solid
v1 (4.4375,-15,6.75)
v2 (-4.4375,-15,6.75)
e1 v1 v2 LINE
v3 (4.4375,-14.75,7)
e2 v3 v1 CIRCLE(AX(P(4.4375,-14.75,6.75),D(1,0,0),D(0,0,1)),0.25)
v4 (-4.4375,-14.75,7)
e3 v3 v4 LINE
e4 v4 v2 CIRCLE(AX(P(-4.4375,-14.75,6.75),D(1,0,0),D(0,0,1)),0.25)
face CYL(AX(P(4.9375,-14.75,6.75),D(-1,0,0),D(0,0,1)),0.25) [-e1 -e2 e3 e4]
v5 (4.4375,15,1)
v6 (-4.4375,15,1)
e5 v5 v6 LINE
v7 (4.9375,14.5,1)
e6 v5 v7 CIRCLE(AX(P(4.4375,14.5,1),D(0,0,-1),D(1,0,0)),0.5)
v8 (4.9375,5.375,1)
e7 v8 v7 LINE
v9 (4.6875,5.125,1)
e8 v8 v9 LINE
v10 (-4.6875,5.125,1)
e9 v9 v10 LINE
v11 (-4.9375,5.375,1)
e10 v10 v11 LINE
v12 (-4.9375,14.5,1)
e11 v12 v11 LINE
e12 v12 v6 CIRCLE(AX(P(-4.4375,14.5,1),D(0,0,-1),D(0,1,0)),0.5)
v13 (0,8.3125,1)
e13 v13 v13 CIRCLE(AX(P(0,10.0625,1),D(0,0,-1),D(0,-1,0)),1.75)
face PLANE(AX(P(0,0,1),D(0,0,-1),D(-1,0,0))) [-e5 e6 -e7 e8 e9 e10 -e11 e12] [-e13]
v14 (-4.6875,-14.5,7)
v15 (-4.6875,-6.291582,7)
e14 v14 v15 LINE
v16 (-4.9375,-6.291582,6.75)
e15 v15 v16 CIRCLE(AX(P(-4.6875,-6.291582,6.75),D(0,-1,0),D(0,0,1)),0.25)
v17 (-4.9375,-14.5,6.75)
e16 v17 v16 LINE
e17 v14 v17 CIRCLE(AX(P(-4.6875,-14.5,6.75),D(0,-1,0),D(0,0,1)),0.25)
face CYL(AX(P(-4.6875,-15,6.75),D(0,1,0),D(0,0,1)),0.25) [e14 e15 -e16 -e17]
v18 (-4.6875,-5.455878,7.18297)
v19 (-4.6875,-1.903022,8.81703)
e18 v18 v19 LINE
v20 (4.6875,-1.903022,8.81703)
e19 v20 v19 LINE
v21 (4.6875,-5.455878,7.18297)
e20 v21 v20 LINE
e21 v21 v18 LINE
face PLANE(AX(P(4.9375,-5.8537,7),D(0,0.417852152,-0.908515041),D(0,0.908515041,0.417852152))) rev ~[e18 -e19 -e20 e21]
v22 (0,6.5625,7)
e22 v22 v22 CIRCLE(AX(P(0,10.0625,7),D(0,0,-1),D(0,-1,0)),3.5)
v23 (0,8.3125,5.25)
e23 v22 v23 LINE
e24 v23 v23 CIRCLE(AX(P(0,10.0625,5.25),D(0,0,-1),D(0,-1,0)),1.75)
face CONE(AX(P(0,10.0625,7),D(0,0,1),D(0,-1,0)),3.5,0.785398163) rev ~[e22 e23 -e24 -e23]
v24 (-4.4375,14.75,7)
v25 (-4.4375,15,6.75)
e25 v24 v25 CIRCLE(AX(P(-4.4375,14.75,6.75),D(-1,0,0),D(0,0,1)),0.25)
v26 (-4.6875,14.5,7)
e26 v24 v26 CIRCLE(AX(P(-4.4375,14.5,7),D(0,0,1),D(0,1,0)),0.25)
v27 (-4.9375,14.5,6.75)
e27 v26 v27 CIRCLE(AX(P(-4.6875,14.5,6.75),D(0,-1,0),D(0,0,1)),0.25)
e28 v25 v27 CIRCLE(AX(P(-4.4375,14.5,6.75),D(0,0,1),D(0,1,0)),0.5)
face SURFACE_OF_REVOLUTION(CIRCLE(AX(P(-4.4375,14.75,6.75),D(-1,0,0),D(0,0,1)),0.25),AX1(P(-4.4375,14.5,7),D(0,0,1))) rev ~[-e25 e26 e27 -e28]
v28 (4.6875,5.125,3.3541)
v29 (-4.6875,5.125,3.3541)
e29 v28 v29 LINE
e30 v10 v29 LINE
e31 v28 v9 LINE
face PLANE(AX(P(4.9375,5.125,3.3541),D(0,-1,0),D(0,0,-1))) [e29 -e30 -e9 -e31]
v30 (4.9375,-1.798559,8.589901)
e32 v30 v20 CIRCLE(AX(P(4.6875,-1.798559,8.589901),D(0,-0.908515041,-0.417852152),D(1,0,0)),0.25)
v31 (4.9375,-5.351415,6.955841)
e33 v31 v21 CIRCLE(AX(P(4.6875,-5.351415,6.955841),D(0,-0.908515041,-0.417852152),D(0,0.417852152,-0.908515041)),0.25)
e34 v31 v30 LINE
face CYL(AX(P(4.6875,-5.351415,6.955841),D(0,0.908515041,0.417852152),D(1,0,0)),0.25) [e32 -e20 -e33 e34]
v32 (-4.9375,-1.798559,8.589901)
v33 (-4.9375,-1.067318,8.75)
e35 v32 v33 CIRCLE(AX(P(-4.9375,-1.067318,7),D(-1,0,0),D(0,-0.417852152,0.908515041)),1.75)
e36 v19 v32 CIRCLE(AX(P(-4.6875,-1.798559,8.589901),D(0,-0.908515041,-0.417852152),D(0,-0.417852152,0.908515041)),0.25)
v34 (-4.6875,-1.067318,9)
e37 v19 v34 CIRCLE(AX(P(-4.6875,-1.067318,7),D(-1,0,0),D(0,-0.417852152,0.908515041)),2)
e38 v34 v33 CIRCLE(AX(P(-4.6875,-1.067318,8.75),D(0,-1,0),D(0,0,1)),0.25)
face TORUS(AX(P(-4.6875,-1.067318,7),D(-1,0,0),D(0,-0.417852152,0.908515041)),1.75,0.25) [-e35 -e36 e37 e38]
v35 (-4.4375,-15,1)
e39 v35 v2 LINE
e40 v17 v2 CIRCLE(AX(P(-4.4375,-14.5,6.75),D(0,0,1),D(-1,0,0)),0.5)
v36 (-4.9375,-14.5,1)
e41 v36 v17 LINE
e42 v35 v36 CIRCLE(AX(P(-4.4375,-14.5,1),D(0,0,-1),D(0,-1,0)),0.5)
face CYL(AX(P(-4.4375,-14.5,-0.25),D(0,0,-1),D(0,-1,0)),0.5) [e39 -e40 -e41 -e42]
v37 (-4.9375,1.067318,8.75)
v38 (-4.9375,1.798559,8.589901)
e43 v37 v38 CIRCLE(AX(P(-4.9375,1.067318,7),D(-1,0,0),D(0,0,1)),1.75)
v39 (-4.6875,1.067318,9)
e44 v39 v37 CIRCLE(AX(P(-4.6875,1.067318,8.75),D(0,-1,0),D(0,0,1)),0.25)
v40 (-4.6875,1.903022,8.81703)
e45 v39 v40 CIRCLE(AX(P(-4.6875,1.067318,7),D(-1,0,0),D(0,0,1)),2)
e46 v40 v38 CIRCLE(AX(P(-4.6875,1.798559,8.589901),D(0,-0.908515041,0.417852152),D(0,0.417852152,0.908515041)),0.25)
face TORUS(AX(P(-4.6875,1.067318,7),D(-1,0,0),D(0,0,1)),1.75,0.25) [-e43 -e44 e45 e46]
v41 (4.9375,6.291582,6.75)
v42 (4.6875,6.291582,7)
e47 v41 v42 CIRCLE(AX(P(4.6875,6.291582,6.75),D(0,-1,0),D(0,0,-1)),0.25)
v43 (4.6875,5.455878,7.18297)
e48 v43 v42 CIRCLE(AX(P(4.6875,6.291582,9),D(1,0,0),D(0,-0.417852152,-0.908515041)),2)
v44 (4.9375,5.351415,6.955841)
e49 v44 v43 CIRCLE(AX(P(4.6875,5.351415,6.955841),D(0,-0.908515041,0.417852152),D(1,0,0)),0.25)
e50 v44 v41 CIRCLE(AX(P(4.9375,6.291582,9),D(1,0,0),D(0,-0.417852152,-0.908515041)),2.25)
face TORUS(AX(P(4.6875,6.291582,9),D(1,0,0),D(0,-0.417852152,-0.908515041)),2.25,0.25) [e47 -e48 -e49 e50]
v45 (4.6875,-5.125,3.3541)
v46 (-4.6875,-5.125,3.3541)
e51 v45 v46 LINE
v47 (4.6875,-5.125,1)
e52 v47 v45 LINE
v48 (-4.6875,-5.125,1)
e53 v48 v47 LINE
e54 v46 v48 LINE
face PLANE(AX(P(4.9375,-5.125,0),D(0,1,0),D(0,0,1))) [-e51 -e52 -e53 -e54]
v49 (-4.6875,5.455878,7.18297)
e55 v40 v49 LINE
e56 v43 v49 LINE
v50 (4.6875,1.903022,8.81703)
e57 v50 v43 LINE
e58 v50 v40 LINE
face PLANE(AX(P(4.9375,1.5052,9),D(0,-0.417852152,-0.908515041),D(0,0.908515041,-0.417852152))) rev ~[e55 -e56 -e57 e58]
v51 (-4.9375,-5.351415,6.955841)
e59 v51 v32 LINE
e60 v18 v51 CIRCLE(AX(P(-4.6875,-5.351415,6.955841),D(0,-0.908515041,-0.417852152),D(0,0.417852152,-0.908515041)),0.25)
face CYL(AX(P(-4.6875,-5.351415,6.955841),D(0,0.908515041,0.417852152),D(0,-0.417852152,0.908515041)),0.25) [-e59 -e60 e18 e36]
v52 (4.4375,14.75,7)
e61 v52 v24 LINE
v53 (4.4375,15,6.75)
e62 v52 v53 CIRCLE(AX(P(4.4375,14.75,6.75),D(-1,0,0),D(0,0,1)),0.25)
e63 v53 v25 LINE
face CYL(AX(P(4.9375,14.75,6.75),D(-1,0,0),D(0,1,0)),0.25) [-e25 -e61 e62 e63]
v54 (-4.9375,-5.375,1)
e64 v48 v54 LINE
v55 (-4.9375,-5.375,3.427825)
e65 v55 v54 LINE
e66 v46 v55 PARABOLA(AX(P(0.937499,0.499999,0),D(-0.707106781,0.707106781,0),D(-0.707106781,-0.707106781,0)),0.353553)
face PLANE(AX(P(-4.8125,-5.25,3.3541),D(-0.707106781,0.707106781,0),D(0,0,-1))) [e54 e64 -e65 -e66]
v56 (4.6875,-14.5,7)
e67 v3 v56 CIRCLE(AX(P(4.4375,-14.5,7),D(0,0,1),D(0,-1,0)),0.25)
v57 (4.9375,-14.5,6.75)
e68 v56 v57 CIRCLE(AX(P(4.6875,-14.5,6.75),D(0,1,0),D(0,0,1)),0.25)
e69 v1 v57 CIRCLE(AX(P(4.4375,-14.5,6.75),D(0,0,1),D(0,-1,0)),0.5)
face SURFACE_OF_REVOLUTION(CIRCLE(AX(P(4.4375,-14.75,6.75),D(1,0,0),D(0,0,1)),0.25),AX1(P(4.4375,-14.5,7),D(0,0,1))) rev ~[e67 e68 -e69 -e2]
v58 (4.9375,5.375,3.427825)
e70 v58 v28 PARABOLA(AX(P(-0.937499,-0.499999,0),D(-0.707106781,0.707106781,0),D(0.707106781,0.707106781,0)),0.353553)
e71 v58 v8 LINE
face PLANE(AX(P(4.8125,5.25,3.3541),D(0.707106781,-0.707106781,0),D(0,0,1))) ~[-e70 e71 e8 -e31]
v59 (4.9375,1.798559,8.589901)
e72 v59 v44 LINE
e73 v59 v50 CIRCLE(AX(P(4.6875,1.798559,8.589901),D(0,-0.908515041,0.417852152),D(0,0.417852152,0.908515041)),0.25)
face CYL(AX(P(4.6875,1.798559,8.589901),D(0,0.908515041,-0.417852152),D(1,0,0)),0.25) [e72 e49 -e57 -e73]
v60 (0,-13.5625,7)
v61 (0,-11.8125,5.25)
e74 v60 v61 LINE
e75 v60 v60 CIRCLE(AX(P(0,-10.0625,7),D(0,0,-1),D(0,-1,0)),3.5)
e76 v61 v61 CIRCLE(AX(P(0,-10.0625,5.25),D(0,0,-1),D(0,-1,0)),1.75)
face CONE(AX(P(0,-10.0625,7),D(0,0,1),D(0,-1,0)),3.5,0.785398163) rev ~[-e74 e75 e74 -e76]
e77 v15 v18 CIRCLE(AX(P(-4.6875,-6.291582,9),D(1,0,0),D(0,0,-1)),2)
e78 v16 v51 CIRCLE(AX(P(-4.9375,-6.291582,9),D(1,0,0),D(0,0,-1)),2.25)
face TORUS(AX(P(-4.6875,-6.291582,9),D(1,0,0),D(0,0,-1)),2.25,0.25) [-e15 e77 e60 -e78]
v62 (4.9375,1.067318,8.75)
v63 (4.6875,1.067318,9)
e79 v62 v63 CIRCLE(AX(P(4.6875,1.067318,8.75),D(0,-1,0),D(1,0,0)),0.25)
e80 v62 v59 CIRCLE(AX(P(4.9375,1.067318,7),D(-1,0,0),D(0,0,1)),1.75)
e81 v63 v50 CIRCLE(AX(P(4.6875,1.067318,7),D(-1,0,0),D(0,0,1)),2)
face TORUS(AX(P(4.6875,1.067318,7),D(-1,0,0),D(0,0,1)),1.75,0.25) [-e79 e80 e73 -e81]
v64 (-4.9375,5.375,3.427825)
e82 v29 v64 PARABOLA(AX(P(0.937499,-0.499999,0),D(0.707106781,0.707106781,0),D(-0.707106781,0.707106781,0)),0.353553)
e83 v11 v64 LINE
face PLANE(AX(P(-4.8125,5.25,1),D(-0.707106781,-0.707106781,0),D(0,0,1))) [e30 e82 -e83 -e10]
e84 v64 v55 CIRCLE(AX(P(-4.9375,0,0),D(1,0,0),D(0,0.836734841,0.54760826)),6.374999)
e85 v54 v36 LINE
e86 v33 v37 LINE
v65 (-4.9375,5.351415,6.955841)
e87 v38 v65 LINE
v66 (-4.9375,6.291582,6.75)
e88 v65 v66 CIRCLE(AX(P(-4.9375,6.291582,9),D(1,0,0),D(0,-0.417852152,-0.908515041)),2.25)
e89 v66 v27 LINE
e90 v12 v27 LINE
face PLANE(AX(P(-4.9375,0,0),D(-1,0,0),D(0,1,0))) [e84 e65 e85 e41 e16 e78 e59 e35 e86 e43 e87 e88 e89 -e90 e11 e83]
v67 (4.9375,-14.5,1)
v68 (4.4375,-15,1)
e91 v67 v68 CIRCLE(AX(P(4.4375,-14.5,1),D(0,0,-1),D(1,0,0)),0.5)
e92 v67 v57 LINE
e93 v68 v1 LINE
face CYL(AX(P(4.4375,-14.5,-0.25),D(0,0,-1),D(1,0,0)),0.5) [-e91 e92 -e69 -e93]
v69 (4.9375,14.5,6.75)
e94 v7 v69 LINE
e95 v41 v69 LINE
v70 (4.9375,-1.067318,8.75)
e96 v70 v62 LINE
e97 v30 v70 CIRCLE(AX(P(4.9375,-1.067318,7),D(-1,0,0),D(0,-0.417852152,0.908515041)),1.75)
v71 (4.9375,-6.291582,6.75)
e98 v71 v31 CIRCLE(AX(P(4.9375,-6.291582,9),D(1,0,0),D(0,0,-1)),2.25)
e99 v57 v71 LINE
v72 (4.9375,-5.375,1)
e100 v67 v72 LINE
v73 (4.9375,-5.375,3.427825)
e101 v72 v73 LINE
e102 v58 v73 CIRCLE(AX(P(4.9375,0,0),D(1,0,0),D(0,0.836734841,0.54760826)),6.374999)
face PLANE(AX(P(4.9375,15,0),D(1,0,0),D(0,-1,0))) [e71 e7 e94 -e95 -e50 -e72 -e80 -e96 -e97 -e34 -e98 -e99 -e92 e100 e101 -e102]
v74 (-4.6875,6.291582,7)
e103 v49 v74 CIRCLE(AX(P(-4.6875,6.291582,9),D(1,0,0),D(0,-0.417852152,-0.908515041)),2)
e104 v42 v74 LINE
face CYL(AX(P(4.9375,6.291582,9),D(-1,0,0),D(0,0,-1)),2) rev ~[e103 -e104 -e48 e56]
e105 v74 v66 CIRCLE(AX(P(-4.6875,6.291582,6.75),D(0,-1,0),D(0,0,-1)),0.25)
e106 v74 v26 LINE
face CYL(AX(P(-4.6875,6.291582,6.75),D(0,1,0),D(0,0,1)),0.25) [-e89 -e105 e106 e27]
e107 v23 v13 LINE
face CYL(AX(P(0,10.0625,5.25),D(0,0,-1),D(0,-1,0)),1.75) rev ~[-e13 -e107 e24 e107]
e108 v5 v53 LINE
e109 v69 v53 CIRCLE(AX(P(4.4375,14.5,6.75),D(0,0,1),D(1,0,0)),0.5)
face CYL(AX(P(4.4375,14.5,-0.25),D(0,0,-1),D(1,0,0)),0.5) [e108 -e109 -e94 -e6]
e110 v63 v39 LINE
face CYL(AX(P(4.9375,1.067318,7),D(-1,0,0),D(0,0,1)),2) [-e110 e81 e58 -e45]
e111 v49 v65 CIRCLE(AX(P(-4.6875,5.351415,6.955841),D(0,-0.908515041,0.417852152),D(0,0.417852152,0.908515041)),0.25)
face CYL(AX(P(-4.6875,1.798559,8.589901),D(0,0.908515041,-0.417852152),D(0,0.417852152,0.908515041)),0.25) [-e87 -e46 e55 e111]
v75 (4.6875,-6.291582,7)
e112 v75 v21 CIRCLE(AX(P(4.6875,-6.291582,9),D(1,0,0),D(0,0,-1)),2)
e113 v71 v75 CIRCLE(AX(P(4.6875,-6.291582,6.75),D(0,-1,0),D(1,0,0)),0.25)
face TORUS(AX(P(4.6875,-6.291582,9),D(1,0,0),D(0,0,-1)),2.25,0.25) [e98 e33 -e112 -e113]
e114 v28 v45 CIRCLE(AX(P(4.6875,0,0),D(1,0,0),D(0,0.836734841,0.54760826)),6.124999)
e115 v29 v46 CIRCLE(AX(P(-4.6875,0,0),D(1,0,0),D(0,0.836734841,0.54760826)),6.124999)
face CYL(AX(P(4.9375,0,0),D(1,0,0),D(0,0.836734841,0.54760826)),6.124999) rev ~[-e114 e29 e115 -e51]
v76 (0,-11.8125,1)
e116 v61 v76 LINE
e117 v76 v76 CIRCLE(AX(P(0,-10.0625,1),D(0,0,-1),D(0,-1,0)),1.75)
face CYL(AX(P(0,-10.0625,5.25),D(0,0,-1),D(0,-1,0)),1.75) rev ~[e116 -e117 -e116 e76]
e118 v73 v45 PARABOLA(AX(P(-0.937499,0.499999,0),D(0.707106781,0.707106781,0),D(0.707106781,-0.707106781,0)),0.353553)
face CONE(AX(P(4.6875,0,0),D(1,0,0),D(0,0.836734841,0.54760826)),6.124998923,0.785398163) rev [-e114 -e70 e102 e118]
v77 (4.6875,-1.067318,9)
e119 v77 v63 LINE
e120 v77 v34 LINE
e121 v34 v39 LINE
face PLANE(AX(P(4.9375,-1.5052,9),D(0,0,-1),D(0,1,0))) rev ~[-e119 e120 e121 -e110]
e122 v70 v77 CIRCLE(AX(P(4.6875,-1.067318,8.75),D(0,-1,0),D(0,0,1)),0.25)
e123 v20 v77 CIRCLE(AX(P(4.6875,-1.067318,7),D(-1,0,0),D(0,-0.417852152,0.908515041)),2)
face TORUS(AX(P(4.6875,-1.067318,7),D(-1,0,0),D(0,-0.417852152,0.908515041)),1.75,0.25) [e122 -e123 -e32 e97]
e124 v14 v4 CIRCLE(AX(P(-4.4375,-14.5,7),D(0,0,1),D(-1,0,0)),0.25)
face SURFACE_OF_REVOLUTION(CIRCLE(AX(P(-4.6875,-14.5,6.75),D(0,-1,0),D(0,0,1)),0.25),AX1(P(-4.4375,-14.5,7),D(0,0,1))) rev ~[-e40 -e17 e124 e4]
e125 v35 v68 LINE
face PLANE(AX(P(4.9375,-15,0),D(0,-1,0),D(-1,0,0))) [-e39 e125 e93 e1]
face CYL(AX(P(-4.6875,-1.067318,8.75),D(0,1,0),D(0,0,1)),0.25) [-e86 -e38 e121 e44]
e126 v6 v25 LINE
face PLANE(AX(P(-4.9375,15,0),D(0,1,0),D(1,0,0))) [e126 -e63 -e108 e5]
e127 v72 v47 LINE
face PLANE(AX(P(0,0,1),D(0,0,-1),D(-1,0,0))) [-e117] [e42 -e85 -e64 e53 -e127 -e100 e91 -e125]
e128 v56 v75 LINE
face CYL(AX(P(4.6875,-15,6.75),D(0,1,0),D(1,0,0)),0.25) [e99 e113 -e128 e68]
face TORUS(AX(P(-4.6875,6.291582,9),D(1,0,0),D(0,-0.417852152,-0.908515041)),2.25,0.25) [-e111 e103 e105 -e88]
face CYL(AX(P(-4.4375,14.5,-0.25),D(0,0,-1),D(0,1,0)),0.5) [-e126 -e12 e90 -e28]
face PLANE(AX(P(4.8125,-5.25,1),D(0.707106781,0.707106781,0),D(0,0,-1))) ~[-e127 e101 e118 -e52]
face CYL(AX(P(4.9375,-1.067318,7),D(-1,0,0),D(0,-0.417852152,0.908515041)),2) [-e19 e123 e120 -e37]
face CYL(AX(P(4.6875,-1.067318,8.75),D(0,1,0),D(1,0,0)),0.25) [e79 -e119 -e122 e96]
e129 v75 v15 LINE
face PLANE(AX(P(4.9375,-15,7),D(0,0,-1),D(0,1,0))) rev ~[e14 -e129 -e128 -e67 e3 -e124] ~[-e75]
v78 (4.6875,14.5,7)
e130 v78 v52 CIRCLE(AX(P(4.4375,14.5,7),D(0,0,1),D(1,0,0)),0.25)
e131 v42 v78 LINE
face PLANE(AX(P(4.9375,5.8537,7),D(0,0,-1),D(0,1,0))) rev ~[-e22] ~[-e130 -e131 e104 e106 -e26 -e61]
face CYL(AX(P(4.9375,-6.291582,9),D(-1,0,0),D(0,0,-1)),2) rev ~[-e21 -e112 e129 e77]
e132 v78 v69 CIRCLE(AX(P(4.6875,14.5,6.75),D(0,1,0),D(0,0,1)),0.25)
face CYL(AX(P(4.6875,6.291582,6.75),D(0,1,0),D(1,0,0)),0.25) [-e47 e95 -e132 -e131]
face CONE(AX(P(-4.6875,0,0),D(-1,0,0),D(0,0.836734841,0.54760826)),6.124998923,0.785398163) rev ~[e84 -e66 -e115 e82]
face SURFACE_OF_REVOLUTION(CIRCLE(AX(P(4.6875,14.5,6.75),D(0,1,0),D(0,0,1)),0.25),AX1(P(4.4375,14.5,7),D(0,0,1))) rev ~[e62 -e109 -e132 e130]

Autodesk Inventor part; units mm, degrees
ref_plane "YZ Plane" through (0, 0, 0) normal (1, 0, 0) x (0, 1, 0)
ref_plane "XZ Plane" through (0, 0, 0) normal (0, 1, 0) x (-1, 0, 0)
ref_plane "XY Plane" through (0, 0, 0) normal (0, 0, 1) x (1, 0, 0)
sketch "Náčrt1" plane through (0, 0, 0) normal (0, 0, 1) x (1, 0, 0)
  line L0 (-4.9375, 15) -> (4.9375, 15)
  line L1 (4.9375, 15) -> (4.9375, -15)
  line L2 (4.9375, -15) -> (-4.9375, -15)
  line L3 (-4.9375, -15) -> (-4.9375, 15)
  line L4 (-4.9375, 15) -> (4.9375, -15) construction
  line L5 (4.9375, 15) -> (-4.9375, -15) construction
  circle A0 centre (0, 10.0625) radius 1.5
  circle A1 centre (0, -10.0625) radius 1.5
  line L6 (-4.9375, 0) -> (4.9375, 0)
  point P0 (0, 0)
  point P1 (0, 15)
  dimension "d0" = 30
  dimension "d1" = 9.875
  dimension "d2" = 3
  dimension "d4" = 4.9375
extrude "Vysunutí1" add sketch "Náčrt1" along normal blind 10
sketch "Náčrt2" plane through (4.9375, -15, 0) normal (1, 0, 0) x (0, 0, -1)
  line L0 (0, 0) -> (0, 30) projected
  line L1 (0, 10) -> (-3.3166, 10)
  arc A0 (-3.3166, 20) -> (-3.3166, 10) centre (0, 15) ccw
  line L2 (-3.3166, 20) -> (0, 20)
  line L3 (0, 9.875) -> (-3.3541, 9.875)
  arc A1 (-3.3541, 20.125) -> (-3.3541, 9.875) centre (0, 15) ccw
  line L4 (-3.3541, 20.125) -> (0, 20.125)
  line L5 (0, 30) -> (-10, 30) projected
  line L6 (0, 6.875) -> (-4.1533, 6.875) construction
  arc A2 (-4.1533, 23.125) -> (-4.1533, 6.875) centre (0, 15) ccw construction
  line L7 (-4.1533, 23.125) -> (0, 23.125) construction
  line L8 (0, 0) -> (-10, 0) projected
  line L9 (-7, 0) -> (-7, 9.1463)
  line L10 (-7, 9.1463) -> (-9, 13.4948)
  line L11 (-9, 16.5052) -> (-7, 20.8537)
  line L12 (-7, 20.8537) -> (-7, 30)
  line L13 (-9, 13.4948) -> (-9, 16.5052)
  line L14 (-10, 0) -> (-10, 30) projected
  point P0 (0, 15)
  point P1 (0, 9.875)
  point P2 (-9, 15)
  point P3 (-10, 15)
  dimension "d7" = 6
  dimension "d8" = 10
  dimension "d9" = 0.125
  dimension "d16" = 3
  dimension "d17" = 3
  dimension "d18" = 3
  dimension "d19" = 1
extrude "Vysunutí2" cut sketch "Náčrt2" against normal through all contours L3 A1 L4 L0 L2 A0 L1 | L8 L14 L5 L12 L11 L13 L10 L9 | L1 A0 L2 L0
fillet "Zaoblení1" radius 2 4 edges at (0, -1.5052, 9) (0, 1.5052, 9) (0, 5.8537, 7) (0, -5.8537, 7)
fillet "Zaoblení2" radius 0.25 20 edges at (0, -15, 7) (0, 15, 7) (4.9375, -5.8638, 7.0463) (4.9375, -3.6794, 8) (4.9375, -1.4951, 8.9537) (4.9375, 0, 9) (4.9375, 1.4951, 8.9537) (4.9375, 3.6794, 8) (4.9375, 5.8638, 7.0463) (4.9375, 10.6458, 7) (4.9375, -10.6458, 7) (-4.9375, -5.8638, 7.0463) (-4.9375, -3.6794, 8) (-4.9375, -1.4951, 8.9537) (-4.9375, 0, 9) (-4.9375, 1.4951, 8.9537) (-4.9375, 3.6794, 8) (-4.9375, 5.8638, 7.0463) (-4.9375, 10.6458, 7) (-4.9375, -10.6458, 7)
sketch "Náčrt3" plane through (0, 0, 0) normal (0, 0, -1) x (-1, 0, 0)
  line L0 (4.9375, -5.125) -> (-4.9375, -5.125) projected
  line L1 (-4.9375, -15) -> (-4.9375, -5.125) projected
  line L2 (4.9375, -15) -> (-4.9375, -15) projected
  line L3 (4.9375, -5.125) -> (4.9375, -15) projected
  circle A0 centre (0, -10.0625) radius 1.5 projected
  line L4 (-4.9375, 5.125) -> (4.9375, 5.125) projected
  line L5 (4.9375, 15) -> (4.9375, 5.125) projected
  line L6 (-4.9375, 15) -> (4.9375, 15) projected
  line L7 (-4.9375, 5.125) -> (-4.9375, 15) projected
  circle A1 centre (0, 10.0625) radius 1.5 projected
  point P0 (0, 0)
extrude "Vysunutí3" cut sketch "Náčrt3" against normal blind 1
chamfer "Zkosení1" distance 0.25 angle 45 6 edges at (4.9375, -5.125, 2.1771) (4.9375, 0, 6.125) (4.9375, 5.125, 2.1771) (-4.9375, -5.125, 2.1771) (-4.9375, 0, 6.125) (-4.9375, 5.125, 2.1771)
fillet "Zaoblení3" radius 0.5 8 edges at (4.8643, -14.9268, 6.9268) (4.9375, -15, 3.875) (-4.8643, -14.9268, 6.9268) (-4.9375, -15, 3.875) (-4.8643, 14.9268, 6.9268) (-4.9375, 15, 3.875) (4.8643, 14.9268, 6.9268) (4.9375, 15, 3.875)
sketch "Náčrt4" plane through (-4.6875, 6.2916, 7) normal (0, 0, 1) x (1, 0, 0)
  circle A0 centre (4.6875, 3.7709) radius 1.5 projected
  point P0 (4.6875, -6.2916)
hole "Díra1" at (0, 10.0625, 7) direction (0, 0, -1) diameter 3.5 end through all countersink diameter 7 countersink angle 90
sketch "Náčrt5" plane through (-4.6875, -6.2916, 7) normal (0, 0, 1) x (1, 0, 0)
  circle A0 centre (4.6875, -3.7709) radius 1.5 projected
  point P0 (4.6875, 6.2916)
hole "Díra2" at (0, -10.0625, 7) direction (0, 0, -1) diameter 3.5 end through all countersink diameter 7 countersink angle 90
properties part number "Objímka motoru pro plochu s držákem"
